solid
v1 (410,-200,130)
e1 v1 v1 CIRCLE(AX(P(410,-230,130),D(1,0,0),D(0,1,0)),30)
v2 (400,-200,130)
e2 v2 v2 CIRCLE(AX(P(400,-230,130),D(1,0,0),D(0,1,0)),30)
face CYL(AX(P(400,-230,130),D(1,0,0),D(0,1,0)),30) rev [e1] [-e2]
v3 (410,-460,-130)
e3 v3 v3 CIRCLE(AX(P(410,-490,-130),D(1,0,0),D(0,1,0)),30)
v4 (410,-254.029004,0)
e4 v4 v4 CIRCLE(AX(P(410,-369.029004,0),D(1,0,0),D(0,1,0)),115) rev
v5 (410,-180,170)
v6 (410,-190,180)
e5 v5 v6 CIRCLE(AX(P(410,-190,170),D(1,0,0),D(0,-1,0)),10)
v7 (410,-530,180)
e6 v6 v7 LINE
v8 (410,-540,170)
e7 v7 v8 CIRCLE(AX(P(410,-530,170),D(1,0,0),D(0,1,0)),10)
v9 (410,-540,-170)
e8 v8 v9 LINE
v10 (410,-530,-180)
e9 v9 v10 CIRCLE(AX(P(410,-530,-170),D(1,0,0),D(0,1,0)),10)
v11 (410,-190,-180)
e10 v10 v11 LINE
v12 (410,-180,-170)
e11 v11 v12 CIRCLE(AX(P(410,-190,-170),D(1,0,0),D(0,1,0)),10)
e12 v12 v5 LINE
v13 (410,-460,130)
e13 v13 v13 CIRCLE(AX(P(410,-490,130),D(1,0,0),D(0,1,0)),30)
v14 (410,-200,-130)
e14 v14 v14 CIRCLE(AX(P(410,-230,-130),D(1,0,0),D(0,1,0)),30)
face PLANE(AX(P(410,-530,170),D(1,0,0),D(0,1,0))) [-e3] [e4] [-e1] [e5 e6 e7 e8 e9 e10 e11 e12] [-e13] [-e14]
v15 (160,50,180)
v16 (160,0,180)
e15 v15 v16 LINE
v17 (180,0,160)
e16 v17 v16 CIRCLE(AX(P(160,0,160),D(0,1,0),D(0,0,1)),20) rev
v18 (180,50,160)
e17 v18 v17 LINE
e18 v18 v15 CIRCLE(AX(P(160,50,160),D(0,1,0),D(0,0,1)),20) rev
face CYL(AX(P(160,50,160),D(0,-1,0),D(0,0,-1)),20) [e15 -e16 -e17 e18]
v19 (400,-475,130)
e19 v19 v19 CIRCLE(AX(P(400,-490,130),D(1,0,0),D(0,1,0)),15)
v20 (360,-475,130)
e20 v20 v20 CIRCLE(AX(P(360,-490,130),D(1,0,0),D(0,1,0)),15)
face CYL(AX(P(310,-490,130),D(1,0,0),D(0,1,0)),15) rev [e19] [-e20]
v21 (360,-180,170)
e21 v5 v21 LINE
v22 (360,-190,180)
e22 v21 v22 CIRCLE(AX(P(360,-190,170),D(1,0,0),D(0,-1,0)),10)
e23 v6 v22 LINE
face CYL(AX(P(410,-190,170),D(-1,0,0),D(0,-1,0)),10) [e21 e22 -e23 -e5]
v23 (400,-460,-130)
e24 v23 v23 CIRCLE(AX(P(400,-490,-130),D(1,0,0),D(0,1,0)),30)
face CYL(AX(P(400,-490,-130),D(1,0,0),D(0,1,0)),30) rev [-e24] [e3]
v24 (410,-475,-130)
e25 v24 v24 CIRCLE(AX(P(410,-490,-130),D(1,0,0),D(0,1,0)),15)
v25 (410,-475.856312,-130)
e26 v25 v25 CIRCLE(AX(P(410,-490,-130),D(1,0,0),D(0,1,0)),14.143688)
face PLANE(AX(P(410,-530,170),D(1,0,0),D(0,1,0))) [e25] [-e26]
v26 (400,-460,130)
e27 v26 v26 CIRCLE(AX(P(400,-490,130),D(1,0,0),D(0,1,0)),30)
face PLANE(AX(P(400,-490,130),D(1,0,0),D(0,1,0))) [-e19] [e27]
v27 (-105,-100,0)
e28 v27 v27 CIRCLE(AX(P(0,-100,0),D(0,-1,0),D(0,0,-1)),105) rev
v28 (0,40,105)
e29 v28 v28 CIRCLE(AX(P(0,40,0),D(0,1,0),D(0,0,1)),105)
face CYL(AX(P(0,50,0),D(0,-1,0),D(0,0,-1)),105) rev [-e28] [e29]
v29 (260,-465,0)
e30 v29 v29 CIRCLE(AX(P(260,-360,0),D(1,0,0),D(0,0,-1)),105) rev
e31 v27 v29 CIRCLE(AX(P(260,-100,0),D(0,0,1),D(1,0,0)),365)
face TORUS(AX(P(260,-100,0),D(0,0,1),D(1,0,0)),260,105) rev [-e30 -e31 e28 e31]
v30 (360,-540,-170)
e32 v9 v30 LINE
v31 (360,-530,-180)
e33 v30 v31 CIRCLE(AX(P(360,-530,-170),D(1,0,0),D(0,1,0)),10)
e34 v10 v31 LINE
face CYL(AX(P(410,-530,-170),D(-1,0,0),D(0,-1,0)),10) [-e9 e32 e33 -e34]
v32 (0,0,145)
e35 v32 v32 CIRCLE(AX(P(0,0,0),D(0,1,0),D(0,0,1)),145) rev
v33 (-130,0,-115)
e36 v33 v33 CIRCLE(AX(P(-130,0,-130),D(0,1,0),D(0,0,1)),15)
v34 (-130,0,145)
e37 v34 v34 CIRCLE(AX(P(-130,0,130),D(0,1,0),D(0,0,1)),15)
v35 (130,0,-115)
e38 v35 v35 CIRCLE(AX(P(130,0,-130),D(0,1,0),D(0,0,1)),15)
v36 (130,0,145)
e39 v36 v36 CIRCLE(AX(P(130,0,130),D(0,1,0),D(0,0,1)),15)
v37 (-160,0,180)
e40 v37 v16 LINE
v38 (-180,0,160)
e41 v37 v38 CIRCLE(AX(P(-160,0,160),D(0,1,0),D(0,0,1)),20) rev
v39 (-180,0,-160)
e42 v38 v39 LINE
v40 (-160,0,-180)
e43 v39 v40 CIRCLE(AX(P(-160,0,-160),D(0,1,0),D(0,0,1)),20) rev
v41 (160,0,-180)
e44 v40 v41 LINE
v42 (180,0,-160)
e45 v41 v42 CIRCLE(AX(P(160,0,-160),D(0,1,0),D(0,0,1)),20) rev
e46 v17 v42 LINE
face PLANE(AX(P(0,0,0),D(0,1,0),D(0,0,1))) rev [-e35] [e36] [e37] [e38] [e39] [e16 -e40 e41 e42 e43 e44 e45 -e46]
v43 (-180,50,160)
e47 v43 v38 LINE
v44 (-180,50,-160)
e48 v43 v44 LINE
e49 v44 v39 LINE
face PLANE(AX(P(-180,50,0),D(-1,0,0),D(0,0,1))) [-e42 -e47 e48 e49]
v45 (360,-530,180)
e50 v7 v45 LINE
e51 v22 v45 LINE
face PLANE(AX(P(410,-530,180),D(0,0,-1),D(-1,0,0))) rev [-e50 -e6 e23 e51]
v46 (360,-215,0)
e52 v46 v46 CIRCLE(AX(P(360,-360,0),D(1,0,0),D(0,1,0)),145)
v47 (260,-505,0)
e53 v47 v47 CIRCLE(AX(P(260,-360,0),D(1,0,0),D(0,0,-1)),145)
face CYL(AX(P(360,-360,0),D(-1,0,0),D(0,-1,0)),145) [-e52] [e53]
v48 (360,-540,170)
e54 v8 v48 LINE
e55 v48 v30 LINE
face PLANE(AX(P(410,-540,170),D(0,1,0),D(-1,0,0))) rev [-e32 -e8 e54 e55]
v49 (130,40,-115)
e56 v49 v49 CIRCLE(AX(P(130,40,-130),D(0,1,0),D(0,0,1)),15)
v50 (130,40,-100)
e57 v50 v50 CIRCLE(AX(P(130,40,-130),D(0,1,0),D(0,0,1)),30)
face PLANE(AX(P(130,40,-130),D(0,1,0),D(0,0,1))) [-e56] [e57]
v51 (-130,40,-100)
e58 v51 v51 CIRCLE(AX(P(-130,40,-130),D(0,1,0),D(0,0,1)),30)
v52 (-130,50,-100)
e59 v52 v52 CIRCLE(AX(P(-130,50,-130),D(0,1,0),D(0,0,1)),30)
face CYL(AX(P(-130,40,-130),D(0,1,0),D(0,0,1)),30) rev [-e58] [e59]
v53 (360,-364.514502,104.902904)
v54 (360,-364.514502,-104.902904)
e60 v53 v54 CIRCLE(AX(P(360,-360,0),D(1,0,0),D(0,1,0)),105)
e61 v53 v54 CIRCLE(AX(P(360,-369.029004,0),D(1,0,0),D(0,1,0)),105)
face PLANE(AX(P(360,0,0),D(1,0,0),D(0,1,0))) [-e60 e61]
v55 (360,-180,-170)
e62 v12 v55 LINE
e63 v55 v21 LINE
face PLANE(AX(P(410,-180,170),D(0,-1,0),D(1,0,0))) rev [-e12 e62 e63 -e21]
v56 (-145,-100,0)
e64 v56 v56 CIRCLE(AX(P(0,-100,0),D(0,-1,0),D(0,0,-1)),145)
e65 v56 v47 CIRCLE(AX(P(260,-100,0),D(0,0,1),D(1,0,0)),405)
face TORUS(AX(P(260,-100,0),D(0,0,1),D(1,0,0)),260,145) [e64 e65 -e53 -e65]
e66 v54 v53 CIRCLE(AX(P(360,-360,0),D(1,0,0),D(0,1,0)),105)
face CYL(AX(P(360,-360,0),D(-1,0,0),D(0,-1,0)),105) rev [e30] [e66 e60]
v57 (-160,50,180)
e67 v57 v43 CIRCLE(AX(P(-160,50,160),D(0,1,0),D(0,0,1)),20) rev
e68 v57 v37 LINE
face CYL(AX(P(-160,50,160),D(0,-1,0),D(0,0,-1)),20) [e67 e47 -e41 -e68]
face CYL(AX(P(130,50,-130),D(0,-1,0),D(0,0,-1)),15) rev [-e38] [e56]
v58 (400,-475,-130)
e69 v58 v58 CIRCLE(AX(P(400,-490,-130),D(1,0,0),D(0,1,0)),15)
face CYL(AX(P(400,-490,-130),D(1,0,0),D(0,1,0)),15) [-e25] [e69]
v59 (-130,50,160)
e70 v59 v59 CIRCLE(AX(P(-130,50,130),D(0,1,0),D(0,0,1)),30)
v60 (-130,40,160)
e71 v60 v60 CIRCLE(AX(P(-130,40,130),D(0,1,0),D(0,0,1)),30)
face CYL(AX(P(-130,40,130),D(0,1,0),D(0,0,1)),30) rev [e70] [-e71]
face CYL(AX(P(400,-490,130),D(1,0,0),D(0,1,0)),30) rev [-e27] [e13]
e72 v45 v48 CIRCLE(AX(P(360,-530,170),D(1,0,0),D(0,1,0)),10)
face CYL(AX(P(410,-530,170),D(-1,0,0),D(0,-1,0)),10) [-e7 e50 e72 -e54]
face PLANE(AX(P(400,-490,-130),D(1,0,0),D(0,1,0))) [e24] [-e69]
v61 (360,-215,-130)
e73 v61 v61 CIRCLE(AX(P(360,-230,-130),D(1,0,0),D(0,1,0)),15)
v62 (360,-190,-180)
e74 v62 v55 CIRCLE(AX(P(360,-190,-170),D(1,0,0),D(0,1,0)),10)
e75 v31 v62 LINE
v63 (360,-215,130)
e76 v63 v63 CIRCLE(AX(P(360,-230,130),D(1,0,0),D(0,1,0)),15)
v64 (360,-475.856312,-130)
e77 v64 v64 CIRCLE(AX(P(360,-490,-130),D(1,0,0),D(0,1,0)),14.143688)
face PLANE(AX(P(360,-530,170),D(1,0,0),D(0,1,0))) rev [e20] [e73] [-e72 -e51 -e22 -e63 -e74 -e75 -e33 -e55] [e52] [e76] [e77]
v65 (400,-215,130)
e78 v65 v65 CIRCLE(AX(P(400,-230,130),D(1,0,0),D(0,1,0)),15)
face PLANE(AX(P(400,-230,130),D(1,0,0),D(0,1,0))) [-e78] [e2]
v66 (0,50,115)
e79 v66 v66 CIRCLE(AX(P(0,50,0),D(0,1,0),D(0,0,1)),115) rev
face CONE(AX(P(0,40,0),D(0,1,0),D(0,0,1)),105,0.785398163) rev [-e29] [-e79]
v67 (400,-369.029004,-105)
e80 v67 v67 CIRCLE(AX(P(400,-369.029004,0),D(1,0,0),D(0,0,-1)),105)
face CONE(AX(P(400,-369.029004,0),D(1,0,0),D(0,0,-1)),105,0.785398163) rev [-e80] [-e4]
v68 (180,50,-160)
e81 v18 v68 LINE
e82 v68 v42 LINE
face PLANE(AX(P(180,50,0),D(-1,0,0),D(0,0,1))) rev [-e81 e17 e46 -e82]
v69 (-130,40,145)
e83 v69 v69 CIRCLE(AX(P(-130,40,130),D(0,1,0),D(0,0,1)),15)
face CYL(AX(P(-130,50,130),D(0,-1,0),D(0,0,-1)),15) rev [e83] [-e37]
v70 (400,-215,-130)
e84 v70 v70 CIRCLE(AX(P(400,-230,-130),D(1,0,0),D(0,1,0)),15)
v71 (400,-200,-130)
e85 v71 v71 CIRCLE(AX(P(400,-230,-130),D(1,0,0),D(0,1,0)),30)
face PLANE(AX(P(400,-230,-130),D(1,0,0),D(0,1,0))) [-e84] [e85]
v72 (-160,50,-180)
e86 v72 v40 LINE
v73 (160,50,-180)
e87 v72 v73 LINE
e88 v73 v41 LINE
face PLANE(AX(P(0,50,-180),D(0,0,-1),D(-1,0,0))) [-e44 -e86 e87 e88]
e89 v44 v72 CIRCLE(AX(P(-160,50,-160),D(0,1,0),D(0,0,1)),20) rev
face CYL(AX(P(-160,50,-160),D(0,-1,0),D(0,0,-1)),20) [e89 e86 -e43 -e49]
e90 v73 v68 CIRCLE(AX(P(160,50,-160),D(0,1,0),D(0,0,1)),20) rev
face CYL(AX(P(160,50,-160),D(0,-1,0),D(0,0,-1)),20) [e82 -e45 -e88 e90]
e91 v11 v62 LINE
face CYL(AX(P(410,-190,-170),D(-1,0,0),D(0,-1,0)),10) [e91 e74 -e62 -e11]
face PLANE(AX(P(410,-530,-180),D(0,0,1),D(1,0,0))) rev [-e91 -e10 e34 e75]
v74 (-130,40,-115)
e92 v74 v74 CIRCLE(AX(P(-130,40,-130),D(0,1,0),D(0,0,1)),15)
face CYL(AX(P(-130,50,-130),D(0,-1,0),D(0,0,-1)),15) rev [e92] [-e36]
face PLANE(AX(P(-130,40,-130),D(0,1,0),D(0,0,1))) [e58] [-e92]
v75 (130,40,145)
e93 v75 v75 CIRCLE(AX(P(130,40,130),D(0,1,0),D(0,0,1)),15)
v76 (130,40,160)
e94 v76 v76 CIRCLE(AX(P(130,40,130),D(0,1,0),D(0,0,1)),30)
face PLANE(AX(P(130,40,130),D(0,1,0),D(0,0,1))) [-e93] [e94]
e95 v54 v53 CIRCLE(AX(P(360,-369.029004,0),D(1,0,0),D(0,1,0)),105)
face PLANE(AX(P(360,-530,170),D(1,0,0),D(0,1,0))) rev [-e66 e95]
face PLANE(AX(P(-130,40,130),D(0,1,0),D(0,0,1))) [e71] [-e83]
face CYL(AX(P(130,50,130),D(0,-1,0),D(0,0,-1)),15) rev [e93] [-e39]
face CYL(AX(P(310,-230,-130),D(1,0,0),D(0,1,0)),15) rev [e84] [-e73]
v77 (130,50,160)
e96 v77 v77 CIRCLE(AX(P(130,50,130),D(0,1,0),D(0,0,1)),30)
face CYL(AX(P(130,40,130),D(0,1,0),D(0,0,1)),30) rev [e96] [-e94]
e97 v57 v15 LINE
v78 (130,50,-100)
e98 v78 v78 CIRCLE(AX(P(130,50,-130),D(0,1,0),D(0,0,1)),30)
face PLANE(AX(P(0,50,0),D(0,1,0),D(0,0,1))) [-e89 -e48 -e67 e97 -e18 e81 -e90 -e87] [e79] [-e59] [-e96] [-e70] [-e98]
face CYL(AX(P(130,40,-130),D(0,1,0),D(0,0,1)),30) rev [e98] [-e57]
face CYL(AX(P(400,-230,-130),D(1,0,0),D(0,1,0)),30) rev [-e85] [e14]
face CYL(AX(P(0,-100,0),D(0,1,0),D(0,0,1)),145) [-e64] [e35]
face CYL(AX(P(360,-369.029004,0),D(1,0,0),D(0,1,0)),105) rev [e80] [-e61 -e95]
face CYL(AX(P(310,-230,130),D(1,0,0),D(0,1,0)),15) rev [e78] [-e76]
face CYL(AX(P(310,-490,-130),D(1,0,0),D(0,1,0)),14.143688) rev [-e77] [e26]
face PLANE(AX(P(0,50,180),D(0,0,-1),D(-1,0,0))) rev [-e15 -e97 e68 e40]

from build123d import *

# Parameters (mm, degrees)
SKETCH2_R           = 30
SKETCH2_R_2         = 105
SKETCH2_R_3         = 28.090856429
SKETCH2_R_4         = 15
BOSS_EXTRUDE2_DEPTH = 50
SKETCH5_R           = 30
CUT_EXTRUDE1_DEPTH  = 10
CHAMFER2_SIZE       = 10
BOSS_EXTRUDE3_START = 100
SKETCH6_R           = 145
SKETCH6_R_2         = 105
BOSS_EXTRUDE3_DEPTH = 100
CUT_EXTRUDE2_START  = -10
SKETCH9_R           = 30
SKETCH9_R_2         = 15
CUT_EXTRUDE2_DEPTH  = 10
SWEEP3_OUTLINE_R    = 145
SWEEP3_OUTLINE_R_2  = 105
SWEEP3_ANGLE        = 90
SKETCH12_R          = 145
SKETCH12_R_2        = 105
BOSS_EXTRUDE5_DEPTH = 100
BOSS_EXTRUDE6_DEPTH = 50
SKETCH14_R          = 105
CUT_EXTRUDE5_DEPTH  = 50
SKETCH17_R          = 30
SKETCH17_R_2        = 15
CUT_EXTRUDE6_DEPTH  = 10
SKETCH18_R          = 15
SKETCH18_R_2        = 14.143688161
CUT_EXTRUDE7_DEPTH  = 100
CHAMFER3_SIZE       = 10


# Read off the part's stored shape, not the designer's step: Sweep3
with BuildPart() as part:
    # Sketch2 → Boss-Extrude2 (new body)
    # profile 1 of 5: a face of its own
    with BuildSketch(Plane(origin=(0, 0, 0), x_dir=(1, 0, 0), z_dir=(0, 1, 0))):
        with BuildLine():
            Line((-180, -130), (-180, -160))
            ThreePointArc((-180, -160), (-174.142135624, -174.142135624), (-160, -180))
            Line((-160, -180), (160, -180))
            ThreePointArc((160, -180), (174.142135624, -174.142135624), (180, -160))
            Line((180, -160), (180, 160))
            ThreePointArc((180, 160), (174.142135624, 174.142135624), (160, 180))
            Line((160, 180), (-160, 180))
            ThreePointArc((-160, 180), (-174.142135624, 174.142135624), (-180, 160))
            Line((-180, 160), (-180, -130))
        make_face()
        with Locations((-130, -130)):
            Circle(SKETCH2_R, mode=Mode.SUBTRACT)
        with Locations((130, -130)):
            Circle(SKETCH2_R, mode=Mode.SUBTRACT)
        with Locations((-130, 130)):
            Circle(SKETCH2_R, mode=Mode.SUBTRACT)
        with Locations(Location((0, 0, 0), (0, 0, 270))):
            Circle(SKETCH2_R_2, mode=Mode.SUBTRACT)
        with Locations((130, 130)):
            Circle(SKETCH2_R_3, mode=Mode.SUBTRACT)
    # profile 2 of 5: a face of its own
    with BuildSketch(Plane(origin=(0, 0, 0), x_dir=(1, 0, 0), z_dir=(0, 1, 0))):
        with Locations((-130, 130)):
            Circle(SKETCH2_R)
        with Locations(Location((-130, 130, 0), (0, 0, 270))):
            Circle(SKETCH2_R_4, mode=Mode.SUBTRACT)
    # profile 3 of 5: a face of its own
    with BuildSketch(Plane(origin=(0, 0, 0), x_dir=(1, 0, 0), z_dir=(0, 1, 0))):
        with Locations((130, 130)):
            Circle(SKETCH2_R_3)
        with Locations(Location((130, 130, 0), (0, 0, 270))):
            Circle(SKETCH2_R_4, mode=Mode.SUBTRACT)
    # profile 4 of 5: a face of its own
    with BuildSketch(Plane(origin=(0, 0, 0), x_dir=(1, 0, 0), z_dir=(0, 1, 0))):
        with Locations((-130, -130)):
            Circle(SKETCH2_R)
        with Locations(Location((-130, -130, 0), (0, 0, 270))):
            Circle(SKETCH2_R_4, mode=Mode.SUBTRACT)
    # profile 5 of 5: a face of its own
    with BuildSketch(Plane(origin=(0, 0, 0), x_dir=(1, 0, 0), z_dir=(0, 1, 0))):
        with Locations((130, -130)):
            Circle(SKETCH2_R)
        with Locations(Location((130, -130, 0), (0, 0, 270))):
            Circle(SKETCH2_R_4, mode=Mode.SUBTRACT)
    extrude(amount=BOSS_EXTRUDE2_DEPTH)

    # Sketch5 → Cut-Extrude1 (cut)
    with BuildSketch(Plane(origin=(0, 50, 0), x_dir=(1, 0, 0), z_dir=(0, 1, 0))):
        with Locations(Location((-130, 130, 0), (0, 0, 270))):
            Circle(SKETCH5_R)
        with Locations(Location((130, 130, 0), (0, 0, 270))):
            Circle(SKETCH5_R)
        with Locations(Location((-130, -130, 0), (0, 0, 270))):
            Circle(SKETCH5_R)
    extrude(amount=-CUT_EXTRUDE1_DEPTH, mode=Mode.SUBTRACT)

    # Chamfer2
    chamfer2_edges = [part.edges().sort_by_distance(p)[0] for p in [
        (0, 50, -105),
    ]]
    chamfer(chamfer2_edges, length=CHAMFER2_SIZE)

    # Sketch6 → Boss-Extrude3 (add)
    with BuildSketch(Plane.XZ.offset(BOSS_EXTRUDE3_START)):
        with Locations(Location((0, 0, 0), (0, 0, 90))):
            Circle(SKETCH6_R)
        with Locations(Location((0, 0, 0), (0, 0, 270))):
            Circle(SKETCH6_R_2, mode=Mode.SUBTRACT)
    extrude(amount=-BOSS_EXTRUDE3_DEPTH)

    # Sketch9 → Cut-Extrude2 (cut)
    with BuildSketch(Plane(origin=(0, 50, 0), x_dir=(1, 0, 0), z_dir=(0, 1, 0)).offset(CUT_EXTRUDE2_START)):
        with Locations(Location((130, -130, 0), (0, 0, 270))):
            Circle(SKETCH9_R)
        with Locations(Location((130, -130, 0), (0, 0, 270))):
            Circle(SKETCH9_R_2, mode=Mode.SUBTRACT)
    extrude(amount=CUT_EXTRUDE2_DEPTH, mode=Mode.SUBTRACT)

    # Sweep3 outline → Sweep3 (revolve)
    with BuildSketch(Plane(origin=(260, -100, 0), x_dir=(-1, 0, 0), z_dir=(0, 1, 0))):
        with Locations((260, 0)):
            Circle(SWEEP3_OUTLINE_R)
        with Locations((260, 0)):
            Circle(SWEEP3_OUTLINE_R_2, mode=Mode.SUBTRACT)
    revolve(axis=Axis((260, -100, 0), (0, 0, 1)), revolution_arc=SWEEP3_ANGLE)

    # Sketch12 → Boss-Extrude5 (add)
    with BuildSketch(Plane(origin=(260, 0, 0), x_dir=(0, 0, -1), z_dir=(1, 0, 0))):
        with Locations(Location((0, -360, 0), (0, 0, 270))):
            Circle(SKETCH12_R)
        with Locations(Location((0, -360, 0), (0, 0, 270))):
            Circle(SKETCH12_R_2, mode=Mode.SUBTRACT)
    extrude(amount=BOSS_EXTRUDE5_DEPTH)

    # Sketch13 → Boss-Extrude6 (add)
    with BuildSketch(Plane(origin=(360, 0, 0), x_dir=(0, 0, -1), z_dir=(1, 0, 0))):
        with BuildLine():
            Line((-170, -540), (170, -540))
            ThreePointArc((170, -540), (177.071067812, -537.071067812), (180, -530))
            Line((180, -530), (180, -190))
            ThreePointArc((180, -190), (177.071067812, -182.928932188), (170, -180))
            Line((170, -180), (-170, -180))
            ThreePointArc((-170, -180), (-177.071067812, -182.928932188), (-180, -190))
            Line((-180, -190), (-180, -530))
            ThreePointArc((-180, -530), (-177.071067812, -537.071067812), (-170, -540))
        make_face()
    extrude(amount=BOSS_EXTRUDE6_DEPTH)

    # Sketch14 → Cut-Extrude5 (cut)
    with BuildSketch(Plane(origin=(410, 0, 0), x_dir=(0, 0, -1), z_dir=(1, 0, 0))):
        with Locations(Location((0, -369.029004143, 0), (0, 0, 90))):
            Circle(SKETCH14_R)
    extrude(amount=-CUT_EXTRUDE5_DEPTH, mode=Mode.SUBTRACT)

    # Sketch17 → Cut-Extrude6 (cut)
    # profile 1 of 4: a face of its own
    with BuildSketch(Plane(origin=(410, 0, 0), x_dir=(0, 0, -1), z_dir=(1, 0, 0))):
        with Locations(Location((-130, -230, 0), (0, 0, 90))):
            Circle(SKETCH17_R)
        with Locations(Location((-130, -230, 0), (0, 0, 90))):
            Circle(SKETCH17_R_2, mode=Mode.SUBTRACT)
    # profile 2 of 4: a face of its own
    with BuildSketch(Plane(origin=(410, 0, 0), x_dir=(0, 0, -1), z_dir=(1, 0, 0))):
        with Locations(Location((-130, -490, 0), (0, 0, 90))):
            Circle(SKETCH17_R)
        with Locations(Location((-130, -490, 0), (0, 0, 90))):
            Circle(SKETCH17_R_2, mode=Mode.SUBTRACT)
    # profile 3 of 4: a face of its own
    with BuildSketch(Plane(origin=(410, 0, 0), x_dir=(0, 0, -1), z_dir=(1, 0, 0))):
        with Locations(Location((130, -490, 0), (0, 0, 90))):
            Circle(SKETCH17_R)
        with Locations(Location((130, -490, 0), (0, 0, 90))):
            Circle(SKETCH17_R_2, mode=Mode.SUBTRACT)
    # profile 4 of 4: a face of its own
    with BuildSketch(Plane(origin=(410, 0, 0), x_dir=(0, 0, -1), z_dir=(1, 0, 0))):
        with Locations(Location((130, -230, 0), (0, 0, 90))):
            Circle(SKETCH17_R)
        with Locations(Location((130, -230, 0), (0, 0, 90))):
            Circle(SKETCH17_R_2, mode=Mode.SUBTRACT)
    extrude(amount=-CUT_EXTRUDE6_DEPTH, mode=Mode.SUBTRACT)

    # Sketch18 → Cut-Extrude7 (cut)
    with BuildSketch(Plane(origin=(410, 0, 0), x_dir=(0, 0, -1), z_dir=(1, 0, 0))):
        with Locations(Location((-130, -230, 0), (0, 0, 90))):
            Circle(SKETCH18_R)
        with Locations(Location((130, -230, 0), (0, 0, 90))):
            Circle(SKETCH18_R)
        with Locations(Location((-130, -490, 0), (0, 0, 90))):
            Circle(SKETCH18_R)
        with Locations(Location((130, -490, 0), (0, 0, 90))):
            Circle(SKETCH18_R_2)
    extrude(amount=-CUT_EXTRUDE7_DEPTH, mode=Mode.SUBTRACT)

    # Chamfer3
    chamfer3_edges = [part.edges().sort_by_distance(p)[0] for p in [
        (410, -474.029004143, 0),
    ]]
    chamfer(chamfer3_edges, length=CHAMFER3_SIZE)


solid = part.part
